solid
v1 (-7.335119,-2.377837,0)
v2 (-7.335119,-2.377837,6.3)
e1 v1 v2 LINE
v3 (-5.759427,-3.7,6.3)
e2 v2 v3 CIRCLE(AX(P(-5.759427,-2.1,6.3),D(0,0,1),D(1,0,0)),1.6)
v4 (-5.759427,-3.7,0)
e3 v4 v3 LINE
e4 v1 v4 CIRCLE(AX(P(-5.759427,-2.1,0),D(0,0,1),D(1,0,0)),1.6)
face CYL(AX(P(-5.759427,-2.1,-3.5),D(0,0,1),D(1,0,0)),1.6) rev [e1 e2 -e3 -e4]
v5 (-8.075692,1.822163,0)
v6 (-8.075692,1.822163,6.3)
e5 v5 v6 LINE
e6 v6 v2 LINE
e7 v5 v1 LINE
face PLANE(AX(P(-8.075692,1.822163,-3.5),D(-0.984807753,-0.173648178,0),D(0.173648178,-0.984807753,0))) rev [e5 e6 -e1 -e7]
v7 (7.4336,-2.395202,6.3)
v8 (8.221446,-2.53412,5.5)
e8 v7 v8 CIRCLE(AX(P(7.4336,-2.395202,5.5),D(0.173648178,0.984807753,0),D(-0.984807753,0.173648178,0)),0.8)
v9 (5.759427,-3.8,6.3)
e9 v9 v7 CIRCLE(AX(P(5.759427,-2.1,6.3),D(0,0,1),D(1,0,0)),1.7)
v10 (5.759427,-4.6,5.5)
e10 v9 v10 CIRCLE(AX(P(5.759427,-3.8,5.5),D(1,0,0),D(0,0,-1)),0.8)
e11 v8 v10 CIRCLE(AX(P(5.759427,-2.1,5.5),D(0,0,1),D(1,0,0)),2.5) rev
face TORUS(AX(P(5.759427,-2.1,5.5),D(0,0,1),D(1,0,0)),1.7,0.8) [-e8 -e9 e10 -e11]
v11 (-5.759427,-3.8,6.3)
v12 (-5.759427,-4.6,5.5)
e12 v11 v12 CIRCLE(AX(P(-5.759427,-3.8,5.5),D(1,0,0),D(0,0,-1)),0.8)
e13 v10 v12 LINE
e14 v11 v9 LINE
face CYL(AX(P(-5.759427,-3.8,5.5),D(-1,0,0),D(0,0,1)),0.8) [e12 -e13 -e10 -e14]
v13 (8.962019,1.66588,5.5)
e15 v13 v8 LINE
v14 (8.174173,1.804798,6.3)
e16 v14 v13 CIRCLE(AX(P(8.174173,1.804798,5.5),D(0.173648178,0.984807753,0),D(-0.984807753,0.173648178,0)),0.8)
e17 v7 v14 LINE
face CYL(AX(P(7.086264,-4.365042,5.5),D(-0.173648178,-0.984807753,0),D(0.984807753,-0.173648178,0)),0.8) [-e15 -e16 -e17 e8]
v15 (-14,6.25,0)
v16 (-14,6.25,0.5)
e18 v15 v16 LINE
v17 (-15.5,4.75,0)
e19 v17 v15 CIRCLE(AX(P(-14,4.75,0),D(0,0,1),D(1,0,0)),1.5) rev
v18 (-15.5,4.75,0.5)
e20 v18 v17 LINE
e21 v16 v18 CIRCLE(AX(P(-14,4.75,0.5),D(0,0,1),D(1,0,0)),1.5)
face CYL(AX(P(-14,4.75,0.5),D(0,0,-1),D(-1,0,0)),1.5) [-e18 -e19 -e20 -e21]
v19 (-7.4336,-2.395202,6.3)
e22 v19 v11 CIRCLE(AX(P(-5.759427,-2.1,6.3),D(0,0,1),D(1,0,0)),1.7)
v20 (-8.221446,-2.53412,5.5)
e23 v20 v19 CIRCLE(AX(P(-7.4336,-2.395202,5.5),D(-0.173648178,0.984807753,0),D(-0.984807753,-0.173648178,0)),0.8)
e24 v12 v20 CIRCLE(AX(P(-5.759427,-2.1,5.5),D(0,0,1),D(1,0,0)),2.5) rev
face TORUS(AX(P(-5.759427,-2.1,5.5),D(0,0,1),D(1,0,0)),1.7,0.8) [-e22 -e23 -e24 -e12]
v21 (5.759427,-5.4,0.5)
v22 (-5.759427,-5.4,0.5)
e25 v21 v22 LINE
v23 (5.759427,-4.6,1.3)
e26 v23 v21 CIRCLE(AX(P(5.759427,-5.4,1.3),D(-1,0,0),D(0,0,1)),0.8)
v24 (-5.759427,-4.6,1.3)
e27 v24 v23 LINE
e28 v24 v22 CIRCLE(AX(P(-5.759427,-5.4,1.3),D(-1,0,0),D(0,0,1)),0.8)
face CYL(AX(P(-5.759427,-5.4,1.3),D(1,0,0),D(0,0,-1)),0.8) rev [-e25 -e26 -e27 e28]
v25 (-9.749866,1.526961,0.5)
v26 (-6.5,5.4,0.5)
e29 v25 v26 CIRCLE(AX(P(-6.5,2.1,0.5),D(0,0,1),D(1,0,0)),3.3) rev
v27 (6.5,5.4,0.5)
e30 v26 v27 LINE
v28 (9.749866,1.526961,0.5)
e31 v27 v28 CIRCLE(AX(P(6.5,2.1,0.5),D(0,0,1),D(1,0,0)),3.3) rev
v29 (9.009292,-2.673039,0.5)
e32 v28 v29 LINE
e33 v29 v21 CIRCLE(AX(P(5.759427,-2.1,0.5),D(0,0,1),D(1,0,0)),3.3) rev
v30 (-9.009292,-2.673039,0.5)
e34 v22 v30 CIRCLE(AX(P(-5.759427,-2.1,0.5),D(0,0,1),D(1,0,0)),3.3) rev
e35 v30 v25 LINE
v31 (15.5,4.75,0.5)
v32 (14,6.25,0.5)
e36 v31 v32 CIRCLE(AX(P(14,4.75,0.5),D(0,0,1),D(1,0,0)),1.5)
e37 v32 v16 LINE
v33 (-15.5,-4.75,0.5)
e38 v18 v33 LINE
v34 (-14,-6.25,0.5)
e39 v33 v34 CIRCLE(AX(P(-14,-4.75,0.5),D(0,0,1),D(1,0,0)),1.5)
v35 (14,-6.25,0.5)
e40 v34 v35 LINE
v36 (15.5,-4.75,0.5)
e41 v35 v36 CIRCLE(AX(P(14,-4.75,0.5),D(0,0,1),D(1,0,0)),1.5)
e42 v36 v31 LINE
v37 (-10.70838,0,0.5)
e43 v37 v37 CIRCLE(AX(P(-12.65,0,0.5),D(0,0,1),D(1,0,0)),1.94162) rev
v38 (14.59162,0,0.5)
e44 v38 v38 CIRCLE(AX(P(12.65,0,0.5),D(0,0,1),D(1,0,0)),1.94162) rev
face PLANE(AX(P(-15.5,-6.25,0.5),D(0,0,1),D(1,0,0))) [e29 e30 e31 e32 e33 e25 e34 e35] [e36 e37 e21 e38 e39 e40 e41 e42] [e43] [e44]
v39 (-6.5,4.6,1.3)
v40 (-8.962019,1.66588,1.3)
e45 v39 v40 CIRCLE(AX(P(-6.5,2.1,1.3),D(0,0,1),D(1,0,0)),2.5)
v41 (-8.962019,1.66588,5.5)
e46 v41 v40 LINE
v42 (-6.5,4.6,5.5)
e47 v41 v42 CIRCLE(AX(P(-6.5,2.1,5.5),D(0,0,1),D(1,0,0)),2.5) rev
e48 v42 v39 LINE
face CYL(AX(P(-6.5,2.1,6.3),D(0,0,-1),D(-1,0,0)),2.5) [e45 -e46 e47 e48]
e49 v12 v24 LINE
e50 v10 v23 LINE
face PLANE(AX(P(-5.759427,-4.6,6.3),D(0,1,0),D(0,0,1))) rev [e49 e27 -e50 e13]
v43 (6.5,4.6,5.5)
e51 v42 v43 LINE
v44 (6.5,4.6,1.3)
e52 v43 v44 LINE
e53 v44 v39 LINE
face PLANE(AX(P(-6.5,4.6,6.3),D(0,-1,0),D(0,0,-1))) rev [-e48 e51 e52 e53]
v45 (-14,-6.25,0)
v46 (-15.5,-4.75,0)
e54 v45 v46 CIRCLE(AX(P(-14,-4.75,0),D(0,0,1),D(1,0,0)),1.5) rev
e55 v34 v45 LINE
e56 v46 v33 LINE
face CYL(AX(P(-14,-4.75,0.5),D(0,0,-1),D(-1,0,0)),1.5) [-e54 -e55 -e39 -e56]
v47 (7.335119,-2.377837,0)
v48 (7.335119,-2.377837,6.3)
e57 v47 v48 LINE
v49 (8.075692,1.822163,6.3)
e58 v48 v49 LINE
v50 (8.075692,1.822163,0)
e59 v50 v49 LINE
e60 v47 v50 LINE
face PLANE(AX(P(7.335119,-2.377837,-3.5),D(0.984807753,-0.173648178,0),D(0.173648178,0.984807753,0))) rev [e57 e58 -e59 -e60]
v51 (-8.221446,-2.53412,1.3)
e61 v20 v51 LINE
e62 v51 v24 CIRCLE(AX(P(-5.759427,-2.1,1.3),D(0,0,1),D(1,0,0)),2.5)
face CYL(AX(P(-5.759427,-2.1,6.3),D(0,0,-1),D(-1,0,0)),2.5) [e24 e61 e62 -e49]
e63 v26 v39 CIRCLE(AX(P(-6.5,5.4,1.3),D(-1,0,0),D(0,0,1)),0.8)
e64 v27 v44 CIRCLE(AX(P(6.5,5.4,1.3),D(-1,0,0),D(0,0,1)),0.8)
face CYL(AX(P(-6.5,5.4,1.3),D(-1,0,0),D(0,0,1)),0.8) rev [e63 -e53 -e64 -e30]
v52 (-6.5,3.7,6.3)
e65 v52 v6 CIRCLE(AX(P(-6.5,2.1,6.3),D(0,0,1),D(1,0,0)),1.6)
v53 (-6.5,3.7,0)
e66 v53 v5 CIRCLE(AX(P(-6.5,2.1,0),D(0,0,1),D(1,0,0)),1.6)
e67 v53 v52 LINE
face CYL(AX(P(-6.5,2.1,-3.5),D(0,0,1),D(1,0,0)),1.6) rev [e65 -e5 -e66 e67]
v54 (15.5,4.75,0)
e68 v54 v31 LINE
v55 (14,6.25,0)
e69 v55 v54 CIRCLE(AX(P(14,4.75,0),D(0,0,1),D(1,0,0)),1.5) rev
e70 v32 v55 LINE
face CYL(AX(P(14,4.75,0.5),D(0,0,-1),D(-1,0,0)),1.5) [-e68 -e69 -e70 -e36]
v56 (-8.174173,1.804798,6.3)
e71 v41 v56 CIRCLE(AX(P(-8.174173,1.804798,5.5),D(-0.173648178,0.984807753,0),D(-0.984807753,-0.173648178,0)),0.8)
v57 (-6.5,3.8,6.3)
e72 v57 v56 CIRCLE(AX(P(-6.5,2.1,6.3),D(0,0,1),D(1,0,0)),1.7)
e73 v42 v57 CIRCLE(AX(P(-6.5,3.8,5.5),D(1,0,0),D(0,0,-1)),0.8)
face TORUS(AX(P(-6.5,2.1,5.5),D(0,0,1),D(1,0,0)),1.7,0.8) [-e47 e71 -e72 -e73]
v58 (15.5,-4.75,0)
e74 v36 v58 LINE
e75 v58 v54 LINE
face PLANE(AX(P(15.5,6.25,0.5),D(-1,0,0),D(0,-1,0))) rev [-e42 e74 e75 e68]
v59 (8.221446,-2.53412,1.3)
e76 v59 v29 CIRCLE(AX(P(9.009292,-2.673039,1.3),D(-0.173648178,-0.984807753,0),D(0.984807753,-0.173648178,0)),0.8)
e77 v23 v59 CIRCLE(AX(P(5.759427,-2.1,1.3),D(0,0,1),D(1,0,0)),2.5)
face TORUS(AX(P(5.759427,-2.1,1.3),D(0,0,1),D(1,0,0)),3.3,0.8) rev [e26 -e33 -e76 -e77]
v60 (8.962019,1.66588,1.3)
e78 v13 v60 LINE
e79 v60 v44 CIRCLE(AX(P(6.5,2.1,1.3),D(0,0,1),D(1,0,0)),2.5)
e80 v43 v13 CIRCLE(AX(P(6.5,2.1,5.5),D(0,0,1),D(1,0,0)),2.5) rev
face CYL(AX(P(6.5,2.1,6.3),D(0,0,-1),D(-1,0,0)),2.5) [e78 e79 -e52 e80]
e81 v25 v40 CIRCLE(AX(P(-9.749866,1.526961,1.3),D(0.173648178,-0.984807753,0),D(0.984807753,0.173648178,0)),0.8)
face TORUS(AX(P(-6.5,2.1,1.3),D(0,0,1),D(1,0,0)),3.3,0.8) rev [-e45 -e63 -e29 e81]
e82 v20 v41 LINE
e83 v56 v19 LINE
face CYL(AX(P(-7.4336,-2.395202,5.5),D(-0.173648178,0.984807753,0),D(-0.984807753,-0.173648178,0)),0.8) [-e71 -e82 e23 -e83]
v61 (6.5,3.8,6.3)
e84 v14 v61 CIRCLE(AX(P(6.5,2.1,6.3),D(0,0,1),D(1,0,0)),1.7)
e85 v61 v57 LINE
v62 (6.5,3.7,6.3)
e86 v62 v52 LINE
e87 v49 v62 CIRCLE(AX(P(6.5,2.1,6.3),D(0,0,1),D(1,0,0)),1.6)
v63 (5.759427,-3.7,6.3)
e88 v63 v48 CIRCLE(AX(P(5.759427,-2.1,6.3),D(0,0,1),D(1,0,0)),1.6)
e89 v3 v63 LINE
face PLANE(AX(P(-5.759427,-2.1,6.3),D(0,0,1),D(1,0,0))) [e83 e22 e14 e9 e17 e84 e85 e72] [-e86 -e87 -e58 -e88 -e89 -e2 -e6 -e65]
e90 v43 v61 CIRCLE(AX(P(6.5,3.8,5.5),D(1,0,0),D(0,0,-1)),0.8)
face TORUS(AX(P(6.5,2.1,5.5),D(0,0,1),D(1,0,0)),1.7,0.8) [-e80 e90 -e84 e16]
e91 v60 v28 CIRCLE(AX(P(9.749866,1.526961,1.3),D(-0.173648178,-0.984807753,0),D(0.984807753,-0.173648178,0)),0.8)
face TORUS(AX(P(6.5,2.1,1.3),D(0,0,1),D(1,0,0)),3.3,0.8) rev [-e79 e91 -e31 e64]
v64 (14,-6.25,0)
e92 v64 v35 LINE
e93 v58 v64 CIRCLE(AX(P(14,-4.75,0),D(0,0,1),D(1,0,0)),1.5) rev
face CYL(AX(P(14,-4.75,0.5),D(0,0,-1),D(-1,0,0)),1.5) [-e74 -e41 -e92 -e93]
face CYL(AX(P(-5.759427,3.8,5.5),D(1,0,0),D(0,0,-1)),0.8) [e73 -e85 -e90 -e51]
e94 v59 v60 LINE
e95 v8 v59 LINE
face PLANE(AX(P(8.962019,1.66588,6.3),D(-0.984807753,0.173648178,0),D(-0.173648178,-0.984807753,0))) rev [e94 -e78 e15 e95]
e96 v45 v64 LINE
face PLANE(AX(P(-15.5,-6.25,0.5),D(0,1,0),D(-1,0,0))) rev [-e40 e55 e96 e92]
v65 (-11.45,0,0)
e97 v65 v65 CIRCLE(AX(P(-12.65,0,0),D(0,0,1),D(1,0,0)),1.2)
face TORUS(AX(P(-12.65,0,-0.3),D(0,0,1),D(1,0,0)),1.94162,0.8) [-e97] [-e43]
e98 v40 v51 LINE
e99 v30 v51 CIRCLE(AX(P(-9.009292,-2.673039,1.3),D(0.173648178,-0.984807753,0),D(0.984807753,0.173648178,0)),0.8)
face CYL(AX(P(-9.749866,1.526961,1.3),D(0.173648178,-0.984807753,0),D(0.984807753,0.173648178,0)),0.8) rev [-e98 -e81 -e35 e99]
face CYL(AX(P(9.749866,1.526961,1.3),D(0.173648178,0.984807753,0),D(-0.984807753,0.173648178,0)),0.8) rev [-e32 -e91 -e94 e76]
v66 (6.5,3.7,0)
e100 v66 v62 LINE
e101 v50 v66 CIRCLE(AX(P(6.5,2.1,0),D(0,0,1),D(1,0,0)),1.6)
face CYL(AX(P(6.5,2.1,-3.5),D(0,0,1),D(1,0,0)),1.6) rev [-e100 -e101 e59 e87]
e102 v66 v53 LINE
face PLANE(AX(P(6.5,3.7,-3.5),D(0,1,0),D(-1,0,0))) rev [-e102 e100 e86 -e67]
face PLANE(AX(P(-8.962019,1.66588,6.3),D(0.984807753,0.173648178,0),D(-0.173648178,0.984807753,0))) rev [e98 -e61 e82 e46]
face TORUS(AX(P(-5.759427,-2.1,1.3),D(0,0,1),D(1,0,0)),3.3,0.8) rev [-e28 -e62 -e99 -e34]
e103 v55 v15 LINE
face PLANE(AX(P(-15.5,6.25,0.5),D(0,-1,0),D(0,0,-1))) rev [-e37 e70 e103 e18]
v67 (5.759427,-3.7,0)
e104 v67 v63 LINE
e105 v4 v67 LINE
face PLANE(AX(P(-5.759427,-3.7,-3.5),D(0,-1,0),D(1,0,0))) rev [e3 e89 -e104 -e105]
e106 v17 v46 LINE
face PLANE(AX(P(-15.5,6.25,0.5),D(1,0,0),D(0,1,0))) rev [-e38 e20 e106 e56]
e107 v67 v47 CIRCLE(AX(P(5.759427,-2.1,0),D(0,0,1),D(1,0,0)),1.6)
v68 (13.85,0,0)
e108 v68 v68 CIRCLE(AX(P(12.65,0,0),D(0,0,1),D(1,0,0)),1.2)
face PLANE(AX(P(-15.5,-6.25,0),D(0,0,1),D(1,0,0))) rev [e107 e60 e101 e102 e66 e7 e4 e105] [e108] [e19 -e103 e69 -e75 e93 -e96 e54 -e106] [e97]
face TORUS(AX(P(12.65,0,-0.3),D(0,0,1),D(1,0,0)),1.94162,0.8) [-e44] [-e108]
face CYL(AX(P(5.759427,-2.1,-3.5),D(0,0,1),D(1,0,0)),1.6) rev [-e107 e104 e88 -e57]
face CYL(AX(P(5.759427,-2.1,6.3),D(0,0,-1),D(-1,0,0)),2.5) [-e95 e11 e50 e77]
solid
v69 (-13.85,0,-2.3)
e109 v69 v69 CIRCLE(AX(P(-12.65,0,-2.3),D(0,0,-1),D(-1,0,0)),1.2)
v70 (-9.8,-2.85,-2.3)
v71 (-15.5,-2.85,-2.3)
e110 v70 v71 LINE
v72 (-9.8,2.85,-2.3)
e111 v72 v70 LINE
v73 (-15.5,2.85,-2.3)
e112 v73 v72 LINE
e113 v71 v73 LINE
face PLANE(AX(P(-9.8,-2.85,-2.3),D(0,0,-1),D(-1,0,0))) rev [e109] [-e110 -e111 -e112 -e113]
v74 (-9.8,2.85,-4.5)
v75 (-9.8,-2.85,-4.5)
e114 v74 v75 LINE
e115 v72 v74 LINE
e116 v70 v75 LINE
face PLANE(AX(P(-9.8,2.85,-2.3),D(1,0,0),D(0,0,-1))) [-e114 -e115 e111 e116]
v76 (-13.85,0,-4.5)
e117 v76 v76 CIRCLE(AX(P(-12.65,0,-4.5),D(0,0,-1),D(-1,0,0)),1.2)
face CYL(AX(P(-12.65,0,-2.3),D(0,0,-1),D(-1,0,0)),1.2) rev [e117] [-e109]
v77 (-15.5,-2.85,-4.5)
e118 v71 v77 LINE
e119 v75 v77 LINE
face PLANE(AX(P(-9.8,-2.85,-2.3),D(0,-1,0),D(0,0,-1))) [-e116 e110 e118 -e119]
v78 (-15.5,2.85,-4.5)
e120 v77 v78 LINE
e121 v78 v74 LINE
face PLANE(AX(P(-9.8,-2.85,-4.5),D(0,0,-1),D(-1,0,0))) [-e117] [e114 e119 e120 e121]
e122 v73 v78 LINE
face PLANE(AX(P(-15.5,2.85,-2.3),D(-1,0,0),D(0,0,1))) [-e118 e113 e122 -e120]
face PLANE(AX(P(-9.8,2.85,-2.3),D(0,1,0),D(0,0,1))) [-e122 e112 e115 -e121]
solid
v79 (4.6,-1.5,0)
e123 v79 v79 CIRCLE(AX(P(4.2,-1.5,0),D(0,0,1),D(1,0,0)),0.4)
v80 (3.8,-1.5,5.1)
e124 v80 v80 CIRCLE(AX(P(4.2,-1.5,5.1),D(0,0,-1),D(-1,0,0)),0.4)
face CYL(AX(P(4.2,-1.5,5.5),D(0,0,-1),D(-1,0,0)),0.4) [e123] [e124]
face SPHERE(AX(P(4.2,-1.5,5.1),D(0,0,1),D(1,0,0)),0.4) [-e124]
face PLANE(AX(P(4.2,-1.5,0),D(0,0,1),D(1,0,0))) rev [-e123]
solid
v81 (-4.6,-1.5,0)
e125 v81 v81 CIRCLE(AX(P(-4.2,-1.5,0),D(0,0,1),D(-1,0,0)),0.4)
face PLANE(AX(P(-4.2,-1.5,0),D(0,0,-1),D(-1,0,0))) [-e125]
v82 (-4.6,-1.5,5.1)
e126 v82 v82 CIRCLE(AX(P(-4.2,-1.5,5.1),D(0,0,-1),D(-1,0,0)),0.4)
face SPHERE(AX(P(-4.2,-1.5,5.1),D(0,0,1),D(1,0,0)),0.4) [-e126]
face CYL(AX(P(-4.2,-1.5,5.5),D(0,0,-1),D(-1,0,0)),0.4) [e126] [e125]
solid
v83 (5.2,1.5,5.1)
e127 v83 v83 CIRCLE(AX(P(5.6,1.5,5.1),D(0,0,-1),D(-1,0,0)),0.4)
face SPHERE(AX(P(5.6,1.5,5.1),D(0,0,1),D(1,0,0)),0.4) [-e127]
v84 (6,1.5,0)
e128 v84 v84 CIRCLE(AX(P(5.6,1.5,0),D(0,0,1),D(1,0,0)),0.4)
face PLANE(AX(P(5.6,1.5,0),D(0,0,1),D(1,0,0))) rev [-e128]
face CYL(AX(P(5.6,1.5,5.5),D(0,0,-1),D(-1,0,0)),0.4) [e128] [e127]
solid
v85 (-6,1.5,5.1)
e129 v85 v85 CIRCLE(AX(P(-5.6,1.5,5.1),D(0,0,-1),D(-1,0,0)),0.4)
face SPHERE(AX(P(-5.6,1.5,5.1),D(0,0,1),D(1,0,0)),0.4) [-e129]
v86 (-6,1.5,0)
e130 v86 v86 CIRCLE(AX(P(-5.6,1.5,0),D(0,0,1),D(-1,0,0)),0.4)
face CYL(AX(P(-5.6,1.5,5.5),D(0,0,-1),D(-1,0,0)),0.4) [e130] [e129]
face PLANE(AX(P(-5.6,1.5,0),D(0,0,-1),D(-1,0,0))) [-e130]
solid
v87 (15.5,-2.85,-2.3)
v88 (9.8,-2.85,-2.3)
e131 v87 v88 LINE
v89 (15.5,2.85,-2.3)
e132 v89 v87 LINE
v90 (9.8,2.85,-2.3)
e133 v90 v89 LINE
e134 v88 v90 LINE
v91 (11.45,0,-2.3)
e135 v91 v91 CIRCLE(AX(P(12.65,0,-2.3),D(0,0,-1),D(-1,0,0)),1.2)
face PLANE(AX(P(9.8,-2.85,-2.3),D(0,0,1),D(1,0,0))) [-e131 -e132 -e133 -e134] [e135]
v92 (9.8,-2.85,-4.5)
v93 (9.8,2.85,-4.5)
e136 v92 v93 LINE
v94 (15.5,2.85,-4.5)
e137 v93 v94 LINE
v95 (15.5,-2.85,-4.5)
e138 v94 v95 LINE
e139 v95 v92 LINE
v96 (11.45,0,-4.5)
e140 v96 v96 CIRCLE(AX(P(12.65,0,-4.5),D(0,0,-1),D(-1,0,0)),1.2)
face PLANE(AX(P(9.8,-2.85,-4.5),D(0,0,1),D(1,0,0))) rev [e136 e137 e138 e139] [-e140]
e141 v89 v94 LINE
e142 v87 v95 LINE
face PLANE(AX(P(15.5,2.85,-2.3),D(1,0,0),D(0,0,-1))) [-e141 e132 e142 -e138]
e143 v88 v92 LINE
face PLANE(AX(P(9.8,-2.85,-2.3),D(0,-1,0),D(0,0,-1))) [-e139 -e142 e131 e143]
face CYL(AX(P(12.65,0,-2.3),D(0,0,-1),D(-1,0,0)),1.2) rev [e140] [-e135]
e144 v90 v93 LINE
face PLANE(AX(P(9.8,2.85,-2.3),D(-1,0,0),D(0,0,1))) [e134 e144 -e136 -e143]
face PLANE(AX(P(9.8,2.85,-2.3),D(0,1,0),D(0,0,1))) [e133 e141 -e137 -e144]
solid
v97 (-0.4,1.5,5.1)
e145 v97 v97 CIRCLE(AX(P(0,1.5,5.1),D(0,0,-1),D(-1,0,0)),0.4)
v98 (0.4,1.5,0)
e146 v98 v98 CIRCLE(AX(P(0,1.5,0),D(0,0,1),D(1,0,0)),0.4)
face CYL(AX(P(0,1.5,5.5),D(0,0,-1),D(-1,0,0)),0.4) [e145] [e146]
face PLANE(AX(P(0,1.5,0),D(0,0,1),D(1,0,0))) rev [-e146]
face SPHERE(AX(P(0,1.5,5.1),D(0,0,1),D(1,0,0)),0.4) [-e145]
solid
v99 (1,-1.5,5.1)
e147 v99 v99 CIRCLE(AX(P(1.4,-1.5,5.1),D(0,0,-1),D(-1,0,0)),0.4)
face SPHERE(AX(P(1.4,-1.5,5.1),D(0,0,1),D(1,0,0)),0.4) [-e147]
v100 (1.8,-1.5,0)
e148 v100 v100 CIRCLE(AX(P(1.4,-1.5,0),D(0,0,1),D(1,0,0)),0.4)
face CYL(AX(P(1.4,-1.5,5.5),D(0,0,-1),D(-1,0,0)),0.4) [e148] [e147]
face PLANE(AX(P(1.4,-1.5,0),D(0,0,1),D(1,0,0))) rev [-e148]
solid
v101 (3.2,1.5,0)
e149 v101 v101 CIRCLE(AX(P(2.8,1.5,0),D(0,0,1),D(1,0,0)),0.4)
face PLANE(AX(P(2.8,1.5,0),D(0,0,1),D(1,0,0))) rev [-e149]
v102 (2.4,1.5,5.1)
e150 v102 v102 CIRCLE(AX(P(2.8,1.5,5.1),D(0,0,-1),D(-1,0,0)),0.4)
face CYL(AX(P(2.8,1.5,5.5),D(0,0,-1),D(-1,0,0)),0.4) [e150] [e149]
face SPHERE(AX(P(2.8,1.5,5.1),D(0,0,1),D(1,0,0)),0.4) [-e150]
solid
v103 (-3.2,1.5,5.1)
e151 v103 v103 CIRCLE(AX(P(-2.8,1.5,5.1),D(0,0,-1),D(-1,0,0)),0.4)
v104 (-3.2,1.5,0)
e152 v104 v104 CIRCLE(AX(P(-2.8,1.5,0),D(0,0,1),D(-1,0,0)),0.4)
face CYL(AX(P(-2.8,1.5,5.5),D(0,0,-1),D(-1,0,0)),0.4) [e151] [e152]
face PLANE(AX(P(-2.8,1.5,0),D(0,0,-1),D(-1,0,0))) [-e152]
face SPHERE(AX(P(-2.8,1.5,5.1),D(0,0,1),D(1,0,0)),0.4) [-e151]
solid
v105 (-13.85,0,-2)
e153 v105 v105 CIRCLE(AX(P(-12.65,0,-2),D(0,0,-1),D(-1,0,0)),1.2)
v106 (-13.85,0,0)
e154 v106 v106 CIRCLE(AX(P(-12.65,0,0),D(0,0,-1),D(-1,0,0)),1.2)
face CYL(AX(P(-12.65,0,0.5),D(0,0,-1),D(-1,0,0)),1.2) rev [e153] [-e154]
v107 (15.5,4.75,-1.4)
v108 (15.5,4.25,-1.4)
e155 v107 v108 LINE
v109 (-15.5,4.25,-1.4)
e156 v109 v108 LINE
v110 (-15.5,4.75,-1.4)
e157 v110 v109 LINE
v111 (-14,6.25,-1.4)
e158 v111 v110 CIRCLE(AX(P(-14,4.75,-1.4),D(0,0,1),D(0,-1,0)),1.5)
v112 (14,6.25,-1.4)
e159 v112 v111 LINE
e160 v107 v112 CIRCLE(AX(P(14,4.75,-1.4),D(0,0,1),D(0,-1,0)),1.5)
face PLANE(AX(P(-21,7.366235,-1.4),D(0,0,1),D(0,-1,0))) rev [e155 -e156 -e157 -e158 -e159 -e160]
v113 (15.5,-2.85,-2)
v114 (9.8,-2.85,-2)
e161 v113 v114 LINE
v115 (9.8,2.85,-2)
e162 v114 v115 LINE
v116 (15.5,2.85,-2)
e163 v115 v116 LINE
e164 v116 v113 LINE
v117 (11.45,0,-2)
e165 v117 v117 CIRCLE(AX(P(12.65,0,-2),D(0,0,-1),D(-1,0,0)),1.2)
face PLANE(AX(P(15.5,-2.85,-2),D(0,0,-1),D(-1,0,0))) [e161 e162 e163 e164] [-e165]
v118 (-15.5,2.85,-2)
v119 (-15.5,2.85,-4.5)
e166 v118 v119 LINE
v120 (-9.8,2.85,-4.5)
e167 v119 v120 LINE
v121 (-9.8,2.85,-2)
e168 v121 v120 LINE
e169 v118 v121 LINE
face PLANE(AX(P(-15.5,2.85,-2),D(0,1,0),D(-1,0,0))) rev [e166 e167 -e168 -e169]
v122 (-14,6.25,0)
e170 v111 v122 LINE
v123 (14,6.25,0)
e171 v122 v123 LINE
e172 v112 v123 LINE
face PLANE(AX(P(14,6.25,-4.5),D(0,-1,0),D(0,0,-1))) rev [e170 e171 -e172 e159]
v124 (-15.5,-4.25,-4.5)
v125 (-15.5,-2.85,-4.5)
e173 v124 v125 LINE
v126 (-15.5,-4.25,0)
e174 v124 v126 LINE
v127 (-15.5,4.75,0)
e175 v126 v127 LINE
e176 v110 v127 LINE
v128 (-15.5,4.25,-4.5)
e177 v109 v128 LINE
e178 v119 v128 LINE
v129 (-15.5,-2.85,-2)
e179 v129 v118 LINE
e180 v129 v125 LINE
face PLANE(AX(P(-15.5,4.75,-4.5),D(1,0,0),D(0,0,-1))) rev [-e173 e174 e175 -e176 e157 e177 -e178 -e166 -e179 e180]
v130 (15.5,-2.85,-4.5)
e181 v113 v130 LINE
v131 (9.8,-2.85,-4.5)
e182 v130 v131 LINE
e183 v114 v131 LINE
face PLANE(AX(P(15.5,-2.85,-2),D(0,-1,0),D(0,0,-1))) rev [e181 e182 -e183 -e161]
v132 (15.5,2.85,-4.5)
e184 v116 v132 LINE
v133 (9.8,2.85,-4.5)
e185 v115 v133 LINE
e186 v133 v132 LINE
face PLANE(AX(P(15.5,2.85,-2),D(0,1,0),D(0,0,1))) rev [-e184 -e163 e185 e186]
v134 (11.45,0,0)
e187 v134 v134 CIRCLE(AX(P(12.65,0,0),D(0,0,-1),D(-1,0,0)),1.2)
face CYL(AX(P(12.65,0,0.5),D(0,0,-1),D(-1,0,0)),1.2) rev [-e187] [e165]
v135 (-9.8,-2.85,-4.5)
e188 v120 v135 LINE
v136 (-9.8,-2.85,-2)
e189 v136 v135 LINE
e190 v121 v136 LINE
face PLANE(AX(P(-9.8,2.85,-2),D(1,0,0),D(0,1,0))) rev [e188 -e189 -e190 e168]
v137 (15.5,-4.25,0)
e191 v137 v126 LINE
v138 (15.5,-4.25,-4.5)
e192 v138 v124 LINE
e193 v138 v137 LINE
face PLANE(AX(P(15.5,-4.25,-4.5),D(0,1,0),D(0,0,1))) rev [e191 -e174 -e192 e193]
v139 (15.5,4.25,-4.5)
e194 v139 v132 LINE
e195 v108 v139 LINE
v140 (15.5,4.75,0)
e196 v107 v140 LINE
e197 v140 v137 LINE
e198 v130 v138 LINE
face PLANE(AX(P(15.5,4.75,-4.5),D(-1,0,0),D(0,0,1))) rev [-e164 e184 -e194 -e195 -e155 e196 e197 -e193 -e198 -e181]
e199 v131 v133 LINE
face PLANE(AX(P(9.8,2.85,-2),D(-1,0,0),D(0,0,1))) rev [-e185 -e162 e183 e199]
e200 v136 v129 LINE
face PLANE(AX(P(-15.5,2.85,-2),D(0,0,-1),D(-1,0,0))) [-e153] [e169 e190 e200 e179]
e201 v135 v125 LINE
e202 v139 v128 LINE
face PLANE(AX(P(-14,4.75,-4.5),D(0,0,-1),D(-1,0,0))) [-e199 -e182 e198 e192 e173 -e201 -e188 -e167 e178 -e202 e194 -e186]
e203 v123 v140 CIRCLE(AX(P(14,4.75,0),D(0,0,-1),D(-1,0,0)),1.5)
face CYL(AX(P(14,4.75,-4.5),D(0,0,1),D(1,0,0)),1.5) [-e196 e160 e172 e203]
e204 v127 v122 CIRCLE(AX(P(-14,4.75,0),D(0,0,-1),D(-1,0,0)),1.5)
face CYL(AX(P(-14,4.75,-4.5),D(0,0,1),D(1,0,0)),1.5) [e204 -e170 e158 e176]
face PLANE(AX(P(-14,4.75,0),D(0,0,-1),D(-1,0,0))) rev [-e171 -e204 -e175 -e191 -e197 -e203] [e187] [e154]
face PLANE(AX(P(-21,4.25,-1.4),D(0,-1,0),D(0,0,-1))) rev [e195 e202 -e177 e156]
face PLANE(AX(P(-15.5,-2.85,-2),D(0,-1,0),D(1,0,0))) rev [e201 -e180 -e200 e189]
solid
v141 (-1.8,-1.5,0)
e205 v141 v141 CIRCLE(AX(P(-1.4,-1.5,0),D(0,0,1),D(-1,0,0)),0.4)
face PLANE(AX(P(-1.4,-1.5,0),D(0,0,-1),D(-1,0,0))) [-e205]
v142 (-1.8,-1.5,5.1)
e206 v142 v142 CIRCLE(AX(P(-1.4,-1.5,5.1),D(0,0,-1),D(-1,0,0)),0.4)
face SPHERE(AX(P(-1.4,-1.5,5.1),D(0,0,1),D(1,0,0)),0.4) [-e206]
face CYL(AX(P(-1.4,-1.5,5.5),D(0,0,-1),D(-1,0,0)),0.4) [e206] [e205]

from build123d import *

# Parameters (mm, degrees)
CROQUIS1_W            = 31
CROQUIS1_H            = 12.5
EXTRUIR1_DEPTH        = 0.5
REDONDEO1_R           = 1.5
EXTRUIR2_DEPTH        = 5.8
CORTAR_EXTRUIR1_DEPTH = 9.8
REDONDEO2_R           = 0.8
REDONDEO3_R           = 0.8
CROQUIS4_R            = 1.2
CORTAR_EXTRUIR2_DEPTH = 9.8
REDONDEO4_R           = 0.8
EXTRUIR3_DEPTH        = 4.5
CROQUIS6_W            = 4.094383516
CROQUIS6_H            = 3.116234629
CORTAR_EXTRUIR3_DEPTH = 36.5
CROQUIS7_W            = 5.7
CROQUIS7_H            = 5.7
CORTAR_EXTRUIR4_DEPTH = 2.5
CROQUIS8_R            = 1.2
CORTAR_EXTRUIR5_DEPTH = 2.5
CROQUIS11_W           = 5.7
CROQUIS11_H           = 5.7
CROQUIS11_R           = 1.2
EXTRUIR5_DEPTH        = 2.2
EXTRUIR5_2_DEPTH      = 2.2
CROQUIS12_R           = 0.4
EXTRUIR6_DEPTH        = 5.5
EXTRUIR6_2_DEPTH      = 5.5
EXTRUIR6_3_DEPTH      = 5.5
EXTRUIR6_4_DEPTH      = 5.5
EXTRUIR6_5_DEPTH      = 5.5
EXTRUIR6_6_DEPTH      = 5.5
EXTRUIR6_7_DEPTH      = 5.5
EXTRUIR6_8_DEPTH      = 5.5
EXTRUIR6_9_DEPTH      = 5.5
REDONDEO5_R           = 0.4
REDONDEO6_R           = 0.4
REDONDEO7_R           = 0.4
REDONDEO8_R           = 0.4
REDONDEO9_R           = 0.4
REDONDEO10_R          = 0.4
REDONDEO11_R          = 0.4
REDONDEO12_R          = 0.4
REDONDEO13_R          = 0.4


with BuildPart() as part:
    # Croquis1 → Extruir1 (new body)
    with BuildSketch(Plane.XY):
        Rectangle(CROQUIS1_W, CROQUIS1_H)
    extrude(amount=EXTRUIR1_DEPTH)

    # Redondeo1
    redondeo1_edges = [part.edges().sort_by_distance(p)[0] for p in [
        (-15.5, 6.25, 0.25),
        (15.5, 6.25, 0.25),
        (15.5, -6.25, 0.25),
        (-15.5, -6.25, 0.25),
    ]]
    fillet(redondeo1_edges, radius=REDONDEO1_R)

    # Croquis2 → Extruir2 (add)
    with BuildSketch(Plane.XY.offset(0.5)):
        with BuildLine():
            Line((-6.5, 4.6), (6.5, 4.6))
            ThreePointArc((6.5, 4.6), (8.415111108, 3.706969024), (8.962019383, 1.665879556))
            Line((8.962019383, 1.665879556), (8.221446064, -2.534120444))
            ThreePointArc((8.221446064, -2.534120444), (7.366395705, -4.015111108), (5.759426681, -4.6))
            Line((5.759426681, -4.6), (-5.759426681, -4.6))
            ThreePointArc((-5.759426681, -4.6), (-7.366395705, -4.015111108), (-8.221446064, -2.534120444))
            Line((-8.221446064, -2.534120444), (-8.962019383, 1.665879556))
            ThreePointArc((-8.962019383, 1.665879556), (-8.415111108, 3.706969024), (-6.5, 4.6))
        make_face()
    extrude(amount=EXTRUIR2_DEPTH)

    # Croquis3 → Cortar-Extruir1 (cut)
    with BuildSketch(Plane.XY.offset(6.3)):
        with BuildLine():
            Line((-5.759426681, -3.7), (5.759426681, -3.7))
            ThreePointArc((5.759426681, -3.7), (6.787886857, -3.325671109), (7.335119086, -2.377837084))
            Line((7.335119086, -2.377837084), (8.075692405, 1.822162916))
            ThreePointArc((8.075692405, 1.822162916), (7.725671109, 3.128460175), (6.5, 3.7))
            Line((6.5, 3.7), (-6.5, 3.7))
            ThreePointArc((-6.5, 3.7), (-7.725671109, 3.128460175), (-8.075692405, 1.822162916))
            Line((-8.075692405, 1.822162916), (-7.335119086, -2.377837084))
            ThreePointArc((-7.335119086, -2.377837084), (-6.787886857, -3.325671109), (-5.759426681, -3.7))
        make_face()
    extrude(amount=-CORTAR_EXTRUIR1_DEPTH, mode=Mode.SUBTRACT)

    # Redondeo2
    redondeo2_edges = [part.edges().sort_by_distance(p)[0] for p in [
        (-7.366395705, -4.015111108, 6.3),
        (0, -4.6, 6.3),
        (7.366395705, -4.015111108, 6.3),
        (8.591732723, -0.434120444, 6.3),
        (8.415111108, 3.706969024, 6.3),
        (0, 4.6, 6.3),
        (-8.415111108, 3.706969024, 6.3),
        (-8.591732723, -0.434120444, 6.3),
    ]]
    fillet(redondeo2_edges, radius=REDONDEO2_R)

    # Redondeo3
    redondeo3_edges = [part.edges().sort_by_distance(p)[0] for p in [
        (-7.366395705, -4.015111108, 0.5),
        (0, -4.6, 0.5),
        (7.366395705, -4.015111108, 0.5),
        (8.591732723, -0.434120444, 0.5),
        (8.415111108, 3.706969024, 0.5),
        (0, 4.6, 0.5),
        (-8.415111108, 3.706969024, 0.5),
        (-8.591732723, -0.434120444, 0.5),
    ]]
    fillet(redondeo3_edges, radius=REDONDEO3_R)

    # Croquis4 → Cortar-Extruir2 (cut)
    with BuildSketch(Plane.XY.offset(0.5)):
        with Locations((12.65, 0)):
            Circle(CROQUIS4_R)
        with Locations((-12.65, 0)):
            Circle(CROQUIS4_R)
    extrude(amount=-CORTAR_EXTRUIR2_DEPTH, mode=Mode.SUBTRACT)

    # Redondeo4
    # the kernel refuses this fillet: 0.8 mm, written as the material it takes off along each edge
    with BuildSketch(Plane(origin=(12.65, 0, 0.5), x_dir=(1, 0, 0), z_dir=(0, -1, 0))) as redondeo4_piece_1:
        with BuildLine():
            CenterArc((1.941619849, -0.8), REDONDEO4_R, 90, 67.975687163)
            Line((1.2, -0.5), (1.185167603, -0.494))
            ThreePointArc((1.185167603, -0.494), (1.184, -0.25), (1.184, 0))
            Line((1.184, 0), (1.2, 0.016))
            Line((1.2, 0.016), (1.941619849, 0.016))
            Line((1.941619849, 0.016), (1.941619849, 0))
        make_face()
    revolve(axis=Axis((12.65, 0, 0.5), (0, 0, 1)), mode=Mode.SUBTRACT)
    with BuildSketch(Plane(origin=(-12.65, 0, 0.5), x_dir=(1, 0, 0), z_dir=(0, -1, 0))) as redondeo4_piece_2:
        with BuildLine():
            CenterArc((1.941619849, -0.8), REDONDEO4_R, 90, 67.975687163)
            Line((1.2, -0.5), (1.185167603, -0.494))
            ThreePointArc((1.185167603, -0.494), (1.184, -0.25), (1.184, 0))
            Line((1.184, 0), (1.2, 0.016))
            Line((1.2, 0.016), (1.941619849, 0.016))
            Line((1.941619849, 0.016), (1.941619849, 0))
        make_face()
    revolve(axis=Axis((-12.65, 0, 0.5), (0, 0, 1)), mode=Mode.SUBTRACT)


with BuildPart() as body_2:
    # Croquis5 → Extruir3 (new body)
    with BuildSketch(Plane(origin=(0, 0, 0), x_dir=(-1, 0, 0), z_dir=(0, 0, -1))):
        with BuildLine():
            Line((-14, 6.25), (14, 6.25))
            ThreePointArc((14, 6.25), (15.060660172, 5.810660172), (15.5, 4.75))
            Line((15.5, 4.75), (15.5, -4.25))
            Line((15.5, -4.25), (-15.5, -4.25))
            Line((-15.5, -4.25), (-15.5, 4.75))
            ThreePointArc((-15.5, 4.75), (-15.060660172, 5.810660172), (-14, 6.25))
        make_face()
    extrude(amount=EXTRUIR3_DEPTH)

    # Croquis6 → Cortar-Extruir3 (cut)
    with BuildSketch(Plane(origin=(15.5, 0, 0), x_dir=(0, 0, -1), z_dir=(1, 0, 0))):
        with Locations((3.447191758, 5.808117315)):
            Rectangle(CROQUIS6_W, CROQUIS6_H)
    extrude(amount=-CORTAR_EXTRUIR3_DEPTH, mode=Mode.SUBTRACT)

    # Croquis7 → Cortar-Extruir4 (cut)
    with BuildSketch(Plane(origin=(0, 0, -4.5), x_dir=(-1, 0, 0), z_dir=(0, 0, -1))):
        with Locations((-12.65, 0)):
            Rectangle(CROQUIS7_W, CROQUIS7_H)
        with Locations((12.65, 0)):
            Rectangle(CROQUIS7_W, CROQUIS7_H)
    extrude(amount=-CORTAR_EXTRUIR4_DEPTH, mode=Mode.SUBTRACT)

    # Croquis8 → Cortar-Extruir5 (cut)
    with BuildSketch(Plane(origin=(0, 0, -2), x_dir=(-1, 0, 0), z_dir=(0, 0, -1))):
        with Locations((-12.65, 0)):
            Circle(CROQUIS8_R)
        with Locations((12.65, 0)):
            Circle(CROQUIS8_R)
    extrude(amount=-CORTAR_EXTRUIR5_DEPTH, mode=Mode.SUBTRACT)


with BuildPart() as body_3:
    # Croquis11 → Extruir5 (new body)
    with BuildSketch(Plane(origin=(0, 0, -4.5), x_dir=(-1, 0, 0), z_dir=(0, 0, -1))):
        with Locations((-12.65, 0)):
            Rectangle(CROQUIS11_W, CROQUIS11_H)
        with Locations((-12.65, 0)):
            Circle(CROQUIS11_R, mode=Mode.SUBTRACT)
    extrude(amount=-EXTRUIR5_DEPTH)


with BuildPart() as body_4:
    # Croquis11 → Extruir5 2 (new body)
    with BuildSketch(Plane(origin=(0, 0, -4.5), x_dir=(-1, 0, 0), z_dir=(0, 0, -1))):
        with Locations((12.65, 0)):
            Rectangle(CROQUIS11_W, CROQUIS11_H)
        with Locations((12.65, 0)):
            Circle(CROQUIS11_R, mode=Mode.SUBTRACT)
    extrude(amount=-EXTRUIR5_2_DEPTH)


with BuildPart() as body_5:
    # Croquis12 → Extruir6 (new body)
    with BuildSketch(Plane.XY):
        with Locations((0, 1.5)):
            Circle(CROQUIS12_R)
    extrude(amount=EXTRUIR6_DEPTH)

    # Redondeo7
    redondeo7_edges = [body_5.edges().sort_by_distance(p)[0] for p in [
        (-0.4, 1.5, 5.5),
    ]]
    fillet(redondeo7_edges, radius=REDONDEO7_R)


with BuildPart() as body_6:
    # Croquis12 → Extruir6 2 (new body)
    with BuildSketch(Plane.XY):
        with Locations((2.8, 1.5)):
            Circle(CROQUIS12_R)
    extrude(amount=EXTRUIR6_2_DEPTH)

    # Redondeo8
    redondeo8_edges = [body_6.edges().sort_by_distance(p)[0] for p in [
        (2.4, 1.5, 5.5),
    ]]
    fillet(redondeo8_edges, radius=REDONDEO8_R)


with BuildPart() as body_7:
    # Croquis12 → Extruir6 3 (new body)
    with BuildSketch(Plane.XY):
        with Locations((5.6, 1.5)):
            Circle(CROQUIS12_R)
    extrude(amount=EXTRUIR6_3_DEPTH)

    # Redondeo9
    redondeo9_edges = [body_7.edges().sort_by_distance(p)[0] for p in [
        (5.2, 1.5, 5.5),
    ]]
    fillet(redondeo9_edges, radius=REDONDEO9_R)


with BuildPart() as body_8:
    # Croquis12 → Extruir6 4 (new body)
    with BuildSketch(Plane.XY):
        with Locations(Location((-5.6, 1.5, 0), (0, 0, 180))):
            Circle(CROQUIS12_R)
    extrude(amount=EXTRUIR6_4_DEPTH)

    # Redondeo5
    redondeo5_edges = [body_8.edges().sort_by_distance(p)[0] for p in [
        (-5.2, 1.5, 5.5),
    ]]
    fillet(redondeo5_edges, radius=REDONDEO5_R)


with BuildPart() as body_9:
    # Croquis12 → Extruir6 5 (new body)
    with BuildSketch(Plane.XY):
        with Locations(Location((-2.8, 1.5, 0), (0, 0, 180))):
            Circle(CROQUIS12_R)
    extrude(amount=EXTRUIR6_5_DEPTH)

    # Redondeo6
    redondeo6_edges = [body_9.edges().sort_by_distance(p)[0] for p in [
        (-2.4, 1.5, 5.5),
    ]]
    fillet(redondeo6_edges, radius=REDONDEO6_R)


with BuildPart() as body_10:
    # Croquis12 → Extruir6 6 (new body)
    with BuildSketch(Plane.XY):
        with Locations(Location((-4.2, -1.5, 0), (0, 0, 180))):
            Circle(CROQUIS12_R)
    extrude(amount=EXTRUIR6_6_DEPTH)

    # Redondeo10
    redondeo10_edges = [body_10.edges().sort_by_distance(p)[0] for p in [
        (-3.8, -1.5, 5.5),
    ]]
    fillet(redondeo10_edges, radius=REDONDEO10_R)


with BuildPart() as body_11:
    # Croquis12 → Extruir6 7 (new body)
    with BuildSketch(Plane.XY):
        with Locations(Location((-1.4, -1.5, 0), (0, 0, 180))):
            Circle(CROQUIS12_R)
    extrude(amount=EXTRUIR6_7_DEPTH)

    # Redondeo11
    redondeo11_edges = [body_11.edges().sort_by_distance(p)[0] for p in [
        (-1, -1.5, 5.5),
    ]]
    fillet(redondeo11_edges, radius=REDONDEO11_R)


with BuildPart() as body_12:
    # Croquis12 → Extruir6 8 (new body)
    with BuildSketch(Plane.XY):
        with Locations((1.4, -1.5)):
            Circle(CROQUIS12_R)
    extrude(amount=EXTRUIR6_8_DEPTH)

    # Redondeo12
    redondeo12_edges = [body_12.edges().sort_by_distance(p)[0] for p in [
        (1, -1.5, 5.5),
    ]]
    fillet(redondeo12_edges, radius=REDONDEO12_R)


with BuildPart() as body_13:
    # Croquis12 → Extruir6 9 (new body)
    with BuildSketch(Plane.XY):
        with Locations((4.2, -1.5)):
            Circle(CROQUIS12_R)
    extrude(amount=EXTRUIR6_9_DEPTH)

    # Redondeo13
    redondeo13_edges = [body_13.edges().sort_by_distance(p)[0] for p in [
        (3.8, -1.5, 5.5),
    ]]
    fillet(redondeo13_edges, radius=REDONDEO13_R)


solid = Compound([part.part, body_2.part, body_3.part, body_4.part, body_5.part, body_6.part, body_7.part, body_8.part, body_9.part, body_10.part, body_11.part, body_12.part, body_13.part])
